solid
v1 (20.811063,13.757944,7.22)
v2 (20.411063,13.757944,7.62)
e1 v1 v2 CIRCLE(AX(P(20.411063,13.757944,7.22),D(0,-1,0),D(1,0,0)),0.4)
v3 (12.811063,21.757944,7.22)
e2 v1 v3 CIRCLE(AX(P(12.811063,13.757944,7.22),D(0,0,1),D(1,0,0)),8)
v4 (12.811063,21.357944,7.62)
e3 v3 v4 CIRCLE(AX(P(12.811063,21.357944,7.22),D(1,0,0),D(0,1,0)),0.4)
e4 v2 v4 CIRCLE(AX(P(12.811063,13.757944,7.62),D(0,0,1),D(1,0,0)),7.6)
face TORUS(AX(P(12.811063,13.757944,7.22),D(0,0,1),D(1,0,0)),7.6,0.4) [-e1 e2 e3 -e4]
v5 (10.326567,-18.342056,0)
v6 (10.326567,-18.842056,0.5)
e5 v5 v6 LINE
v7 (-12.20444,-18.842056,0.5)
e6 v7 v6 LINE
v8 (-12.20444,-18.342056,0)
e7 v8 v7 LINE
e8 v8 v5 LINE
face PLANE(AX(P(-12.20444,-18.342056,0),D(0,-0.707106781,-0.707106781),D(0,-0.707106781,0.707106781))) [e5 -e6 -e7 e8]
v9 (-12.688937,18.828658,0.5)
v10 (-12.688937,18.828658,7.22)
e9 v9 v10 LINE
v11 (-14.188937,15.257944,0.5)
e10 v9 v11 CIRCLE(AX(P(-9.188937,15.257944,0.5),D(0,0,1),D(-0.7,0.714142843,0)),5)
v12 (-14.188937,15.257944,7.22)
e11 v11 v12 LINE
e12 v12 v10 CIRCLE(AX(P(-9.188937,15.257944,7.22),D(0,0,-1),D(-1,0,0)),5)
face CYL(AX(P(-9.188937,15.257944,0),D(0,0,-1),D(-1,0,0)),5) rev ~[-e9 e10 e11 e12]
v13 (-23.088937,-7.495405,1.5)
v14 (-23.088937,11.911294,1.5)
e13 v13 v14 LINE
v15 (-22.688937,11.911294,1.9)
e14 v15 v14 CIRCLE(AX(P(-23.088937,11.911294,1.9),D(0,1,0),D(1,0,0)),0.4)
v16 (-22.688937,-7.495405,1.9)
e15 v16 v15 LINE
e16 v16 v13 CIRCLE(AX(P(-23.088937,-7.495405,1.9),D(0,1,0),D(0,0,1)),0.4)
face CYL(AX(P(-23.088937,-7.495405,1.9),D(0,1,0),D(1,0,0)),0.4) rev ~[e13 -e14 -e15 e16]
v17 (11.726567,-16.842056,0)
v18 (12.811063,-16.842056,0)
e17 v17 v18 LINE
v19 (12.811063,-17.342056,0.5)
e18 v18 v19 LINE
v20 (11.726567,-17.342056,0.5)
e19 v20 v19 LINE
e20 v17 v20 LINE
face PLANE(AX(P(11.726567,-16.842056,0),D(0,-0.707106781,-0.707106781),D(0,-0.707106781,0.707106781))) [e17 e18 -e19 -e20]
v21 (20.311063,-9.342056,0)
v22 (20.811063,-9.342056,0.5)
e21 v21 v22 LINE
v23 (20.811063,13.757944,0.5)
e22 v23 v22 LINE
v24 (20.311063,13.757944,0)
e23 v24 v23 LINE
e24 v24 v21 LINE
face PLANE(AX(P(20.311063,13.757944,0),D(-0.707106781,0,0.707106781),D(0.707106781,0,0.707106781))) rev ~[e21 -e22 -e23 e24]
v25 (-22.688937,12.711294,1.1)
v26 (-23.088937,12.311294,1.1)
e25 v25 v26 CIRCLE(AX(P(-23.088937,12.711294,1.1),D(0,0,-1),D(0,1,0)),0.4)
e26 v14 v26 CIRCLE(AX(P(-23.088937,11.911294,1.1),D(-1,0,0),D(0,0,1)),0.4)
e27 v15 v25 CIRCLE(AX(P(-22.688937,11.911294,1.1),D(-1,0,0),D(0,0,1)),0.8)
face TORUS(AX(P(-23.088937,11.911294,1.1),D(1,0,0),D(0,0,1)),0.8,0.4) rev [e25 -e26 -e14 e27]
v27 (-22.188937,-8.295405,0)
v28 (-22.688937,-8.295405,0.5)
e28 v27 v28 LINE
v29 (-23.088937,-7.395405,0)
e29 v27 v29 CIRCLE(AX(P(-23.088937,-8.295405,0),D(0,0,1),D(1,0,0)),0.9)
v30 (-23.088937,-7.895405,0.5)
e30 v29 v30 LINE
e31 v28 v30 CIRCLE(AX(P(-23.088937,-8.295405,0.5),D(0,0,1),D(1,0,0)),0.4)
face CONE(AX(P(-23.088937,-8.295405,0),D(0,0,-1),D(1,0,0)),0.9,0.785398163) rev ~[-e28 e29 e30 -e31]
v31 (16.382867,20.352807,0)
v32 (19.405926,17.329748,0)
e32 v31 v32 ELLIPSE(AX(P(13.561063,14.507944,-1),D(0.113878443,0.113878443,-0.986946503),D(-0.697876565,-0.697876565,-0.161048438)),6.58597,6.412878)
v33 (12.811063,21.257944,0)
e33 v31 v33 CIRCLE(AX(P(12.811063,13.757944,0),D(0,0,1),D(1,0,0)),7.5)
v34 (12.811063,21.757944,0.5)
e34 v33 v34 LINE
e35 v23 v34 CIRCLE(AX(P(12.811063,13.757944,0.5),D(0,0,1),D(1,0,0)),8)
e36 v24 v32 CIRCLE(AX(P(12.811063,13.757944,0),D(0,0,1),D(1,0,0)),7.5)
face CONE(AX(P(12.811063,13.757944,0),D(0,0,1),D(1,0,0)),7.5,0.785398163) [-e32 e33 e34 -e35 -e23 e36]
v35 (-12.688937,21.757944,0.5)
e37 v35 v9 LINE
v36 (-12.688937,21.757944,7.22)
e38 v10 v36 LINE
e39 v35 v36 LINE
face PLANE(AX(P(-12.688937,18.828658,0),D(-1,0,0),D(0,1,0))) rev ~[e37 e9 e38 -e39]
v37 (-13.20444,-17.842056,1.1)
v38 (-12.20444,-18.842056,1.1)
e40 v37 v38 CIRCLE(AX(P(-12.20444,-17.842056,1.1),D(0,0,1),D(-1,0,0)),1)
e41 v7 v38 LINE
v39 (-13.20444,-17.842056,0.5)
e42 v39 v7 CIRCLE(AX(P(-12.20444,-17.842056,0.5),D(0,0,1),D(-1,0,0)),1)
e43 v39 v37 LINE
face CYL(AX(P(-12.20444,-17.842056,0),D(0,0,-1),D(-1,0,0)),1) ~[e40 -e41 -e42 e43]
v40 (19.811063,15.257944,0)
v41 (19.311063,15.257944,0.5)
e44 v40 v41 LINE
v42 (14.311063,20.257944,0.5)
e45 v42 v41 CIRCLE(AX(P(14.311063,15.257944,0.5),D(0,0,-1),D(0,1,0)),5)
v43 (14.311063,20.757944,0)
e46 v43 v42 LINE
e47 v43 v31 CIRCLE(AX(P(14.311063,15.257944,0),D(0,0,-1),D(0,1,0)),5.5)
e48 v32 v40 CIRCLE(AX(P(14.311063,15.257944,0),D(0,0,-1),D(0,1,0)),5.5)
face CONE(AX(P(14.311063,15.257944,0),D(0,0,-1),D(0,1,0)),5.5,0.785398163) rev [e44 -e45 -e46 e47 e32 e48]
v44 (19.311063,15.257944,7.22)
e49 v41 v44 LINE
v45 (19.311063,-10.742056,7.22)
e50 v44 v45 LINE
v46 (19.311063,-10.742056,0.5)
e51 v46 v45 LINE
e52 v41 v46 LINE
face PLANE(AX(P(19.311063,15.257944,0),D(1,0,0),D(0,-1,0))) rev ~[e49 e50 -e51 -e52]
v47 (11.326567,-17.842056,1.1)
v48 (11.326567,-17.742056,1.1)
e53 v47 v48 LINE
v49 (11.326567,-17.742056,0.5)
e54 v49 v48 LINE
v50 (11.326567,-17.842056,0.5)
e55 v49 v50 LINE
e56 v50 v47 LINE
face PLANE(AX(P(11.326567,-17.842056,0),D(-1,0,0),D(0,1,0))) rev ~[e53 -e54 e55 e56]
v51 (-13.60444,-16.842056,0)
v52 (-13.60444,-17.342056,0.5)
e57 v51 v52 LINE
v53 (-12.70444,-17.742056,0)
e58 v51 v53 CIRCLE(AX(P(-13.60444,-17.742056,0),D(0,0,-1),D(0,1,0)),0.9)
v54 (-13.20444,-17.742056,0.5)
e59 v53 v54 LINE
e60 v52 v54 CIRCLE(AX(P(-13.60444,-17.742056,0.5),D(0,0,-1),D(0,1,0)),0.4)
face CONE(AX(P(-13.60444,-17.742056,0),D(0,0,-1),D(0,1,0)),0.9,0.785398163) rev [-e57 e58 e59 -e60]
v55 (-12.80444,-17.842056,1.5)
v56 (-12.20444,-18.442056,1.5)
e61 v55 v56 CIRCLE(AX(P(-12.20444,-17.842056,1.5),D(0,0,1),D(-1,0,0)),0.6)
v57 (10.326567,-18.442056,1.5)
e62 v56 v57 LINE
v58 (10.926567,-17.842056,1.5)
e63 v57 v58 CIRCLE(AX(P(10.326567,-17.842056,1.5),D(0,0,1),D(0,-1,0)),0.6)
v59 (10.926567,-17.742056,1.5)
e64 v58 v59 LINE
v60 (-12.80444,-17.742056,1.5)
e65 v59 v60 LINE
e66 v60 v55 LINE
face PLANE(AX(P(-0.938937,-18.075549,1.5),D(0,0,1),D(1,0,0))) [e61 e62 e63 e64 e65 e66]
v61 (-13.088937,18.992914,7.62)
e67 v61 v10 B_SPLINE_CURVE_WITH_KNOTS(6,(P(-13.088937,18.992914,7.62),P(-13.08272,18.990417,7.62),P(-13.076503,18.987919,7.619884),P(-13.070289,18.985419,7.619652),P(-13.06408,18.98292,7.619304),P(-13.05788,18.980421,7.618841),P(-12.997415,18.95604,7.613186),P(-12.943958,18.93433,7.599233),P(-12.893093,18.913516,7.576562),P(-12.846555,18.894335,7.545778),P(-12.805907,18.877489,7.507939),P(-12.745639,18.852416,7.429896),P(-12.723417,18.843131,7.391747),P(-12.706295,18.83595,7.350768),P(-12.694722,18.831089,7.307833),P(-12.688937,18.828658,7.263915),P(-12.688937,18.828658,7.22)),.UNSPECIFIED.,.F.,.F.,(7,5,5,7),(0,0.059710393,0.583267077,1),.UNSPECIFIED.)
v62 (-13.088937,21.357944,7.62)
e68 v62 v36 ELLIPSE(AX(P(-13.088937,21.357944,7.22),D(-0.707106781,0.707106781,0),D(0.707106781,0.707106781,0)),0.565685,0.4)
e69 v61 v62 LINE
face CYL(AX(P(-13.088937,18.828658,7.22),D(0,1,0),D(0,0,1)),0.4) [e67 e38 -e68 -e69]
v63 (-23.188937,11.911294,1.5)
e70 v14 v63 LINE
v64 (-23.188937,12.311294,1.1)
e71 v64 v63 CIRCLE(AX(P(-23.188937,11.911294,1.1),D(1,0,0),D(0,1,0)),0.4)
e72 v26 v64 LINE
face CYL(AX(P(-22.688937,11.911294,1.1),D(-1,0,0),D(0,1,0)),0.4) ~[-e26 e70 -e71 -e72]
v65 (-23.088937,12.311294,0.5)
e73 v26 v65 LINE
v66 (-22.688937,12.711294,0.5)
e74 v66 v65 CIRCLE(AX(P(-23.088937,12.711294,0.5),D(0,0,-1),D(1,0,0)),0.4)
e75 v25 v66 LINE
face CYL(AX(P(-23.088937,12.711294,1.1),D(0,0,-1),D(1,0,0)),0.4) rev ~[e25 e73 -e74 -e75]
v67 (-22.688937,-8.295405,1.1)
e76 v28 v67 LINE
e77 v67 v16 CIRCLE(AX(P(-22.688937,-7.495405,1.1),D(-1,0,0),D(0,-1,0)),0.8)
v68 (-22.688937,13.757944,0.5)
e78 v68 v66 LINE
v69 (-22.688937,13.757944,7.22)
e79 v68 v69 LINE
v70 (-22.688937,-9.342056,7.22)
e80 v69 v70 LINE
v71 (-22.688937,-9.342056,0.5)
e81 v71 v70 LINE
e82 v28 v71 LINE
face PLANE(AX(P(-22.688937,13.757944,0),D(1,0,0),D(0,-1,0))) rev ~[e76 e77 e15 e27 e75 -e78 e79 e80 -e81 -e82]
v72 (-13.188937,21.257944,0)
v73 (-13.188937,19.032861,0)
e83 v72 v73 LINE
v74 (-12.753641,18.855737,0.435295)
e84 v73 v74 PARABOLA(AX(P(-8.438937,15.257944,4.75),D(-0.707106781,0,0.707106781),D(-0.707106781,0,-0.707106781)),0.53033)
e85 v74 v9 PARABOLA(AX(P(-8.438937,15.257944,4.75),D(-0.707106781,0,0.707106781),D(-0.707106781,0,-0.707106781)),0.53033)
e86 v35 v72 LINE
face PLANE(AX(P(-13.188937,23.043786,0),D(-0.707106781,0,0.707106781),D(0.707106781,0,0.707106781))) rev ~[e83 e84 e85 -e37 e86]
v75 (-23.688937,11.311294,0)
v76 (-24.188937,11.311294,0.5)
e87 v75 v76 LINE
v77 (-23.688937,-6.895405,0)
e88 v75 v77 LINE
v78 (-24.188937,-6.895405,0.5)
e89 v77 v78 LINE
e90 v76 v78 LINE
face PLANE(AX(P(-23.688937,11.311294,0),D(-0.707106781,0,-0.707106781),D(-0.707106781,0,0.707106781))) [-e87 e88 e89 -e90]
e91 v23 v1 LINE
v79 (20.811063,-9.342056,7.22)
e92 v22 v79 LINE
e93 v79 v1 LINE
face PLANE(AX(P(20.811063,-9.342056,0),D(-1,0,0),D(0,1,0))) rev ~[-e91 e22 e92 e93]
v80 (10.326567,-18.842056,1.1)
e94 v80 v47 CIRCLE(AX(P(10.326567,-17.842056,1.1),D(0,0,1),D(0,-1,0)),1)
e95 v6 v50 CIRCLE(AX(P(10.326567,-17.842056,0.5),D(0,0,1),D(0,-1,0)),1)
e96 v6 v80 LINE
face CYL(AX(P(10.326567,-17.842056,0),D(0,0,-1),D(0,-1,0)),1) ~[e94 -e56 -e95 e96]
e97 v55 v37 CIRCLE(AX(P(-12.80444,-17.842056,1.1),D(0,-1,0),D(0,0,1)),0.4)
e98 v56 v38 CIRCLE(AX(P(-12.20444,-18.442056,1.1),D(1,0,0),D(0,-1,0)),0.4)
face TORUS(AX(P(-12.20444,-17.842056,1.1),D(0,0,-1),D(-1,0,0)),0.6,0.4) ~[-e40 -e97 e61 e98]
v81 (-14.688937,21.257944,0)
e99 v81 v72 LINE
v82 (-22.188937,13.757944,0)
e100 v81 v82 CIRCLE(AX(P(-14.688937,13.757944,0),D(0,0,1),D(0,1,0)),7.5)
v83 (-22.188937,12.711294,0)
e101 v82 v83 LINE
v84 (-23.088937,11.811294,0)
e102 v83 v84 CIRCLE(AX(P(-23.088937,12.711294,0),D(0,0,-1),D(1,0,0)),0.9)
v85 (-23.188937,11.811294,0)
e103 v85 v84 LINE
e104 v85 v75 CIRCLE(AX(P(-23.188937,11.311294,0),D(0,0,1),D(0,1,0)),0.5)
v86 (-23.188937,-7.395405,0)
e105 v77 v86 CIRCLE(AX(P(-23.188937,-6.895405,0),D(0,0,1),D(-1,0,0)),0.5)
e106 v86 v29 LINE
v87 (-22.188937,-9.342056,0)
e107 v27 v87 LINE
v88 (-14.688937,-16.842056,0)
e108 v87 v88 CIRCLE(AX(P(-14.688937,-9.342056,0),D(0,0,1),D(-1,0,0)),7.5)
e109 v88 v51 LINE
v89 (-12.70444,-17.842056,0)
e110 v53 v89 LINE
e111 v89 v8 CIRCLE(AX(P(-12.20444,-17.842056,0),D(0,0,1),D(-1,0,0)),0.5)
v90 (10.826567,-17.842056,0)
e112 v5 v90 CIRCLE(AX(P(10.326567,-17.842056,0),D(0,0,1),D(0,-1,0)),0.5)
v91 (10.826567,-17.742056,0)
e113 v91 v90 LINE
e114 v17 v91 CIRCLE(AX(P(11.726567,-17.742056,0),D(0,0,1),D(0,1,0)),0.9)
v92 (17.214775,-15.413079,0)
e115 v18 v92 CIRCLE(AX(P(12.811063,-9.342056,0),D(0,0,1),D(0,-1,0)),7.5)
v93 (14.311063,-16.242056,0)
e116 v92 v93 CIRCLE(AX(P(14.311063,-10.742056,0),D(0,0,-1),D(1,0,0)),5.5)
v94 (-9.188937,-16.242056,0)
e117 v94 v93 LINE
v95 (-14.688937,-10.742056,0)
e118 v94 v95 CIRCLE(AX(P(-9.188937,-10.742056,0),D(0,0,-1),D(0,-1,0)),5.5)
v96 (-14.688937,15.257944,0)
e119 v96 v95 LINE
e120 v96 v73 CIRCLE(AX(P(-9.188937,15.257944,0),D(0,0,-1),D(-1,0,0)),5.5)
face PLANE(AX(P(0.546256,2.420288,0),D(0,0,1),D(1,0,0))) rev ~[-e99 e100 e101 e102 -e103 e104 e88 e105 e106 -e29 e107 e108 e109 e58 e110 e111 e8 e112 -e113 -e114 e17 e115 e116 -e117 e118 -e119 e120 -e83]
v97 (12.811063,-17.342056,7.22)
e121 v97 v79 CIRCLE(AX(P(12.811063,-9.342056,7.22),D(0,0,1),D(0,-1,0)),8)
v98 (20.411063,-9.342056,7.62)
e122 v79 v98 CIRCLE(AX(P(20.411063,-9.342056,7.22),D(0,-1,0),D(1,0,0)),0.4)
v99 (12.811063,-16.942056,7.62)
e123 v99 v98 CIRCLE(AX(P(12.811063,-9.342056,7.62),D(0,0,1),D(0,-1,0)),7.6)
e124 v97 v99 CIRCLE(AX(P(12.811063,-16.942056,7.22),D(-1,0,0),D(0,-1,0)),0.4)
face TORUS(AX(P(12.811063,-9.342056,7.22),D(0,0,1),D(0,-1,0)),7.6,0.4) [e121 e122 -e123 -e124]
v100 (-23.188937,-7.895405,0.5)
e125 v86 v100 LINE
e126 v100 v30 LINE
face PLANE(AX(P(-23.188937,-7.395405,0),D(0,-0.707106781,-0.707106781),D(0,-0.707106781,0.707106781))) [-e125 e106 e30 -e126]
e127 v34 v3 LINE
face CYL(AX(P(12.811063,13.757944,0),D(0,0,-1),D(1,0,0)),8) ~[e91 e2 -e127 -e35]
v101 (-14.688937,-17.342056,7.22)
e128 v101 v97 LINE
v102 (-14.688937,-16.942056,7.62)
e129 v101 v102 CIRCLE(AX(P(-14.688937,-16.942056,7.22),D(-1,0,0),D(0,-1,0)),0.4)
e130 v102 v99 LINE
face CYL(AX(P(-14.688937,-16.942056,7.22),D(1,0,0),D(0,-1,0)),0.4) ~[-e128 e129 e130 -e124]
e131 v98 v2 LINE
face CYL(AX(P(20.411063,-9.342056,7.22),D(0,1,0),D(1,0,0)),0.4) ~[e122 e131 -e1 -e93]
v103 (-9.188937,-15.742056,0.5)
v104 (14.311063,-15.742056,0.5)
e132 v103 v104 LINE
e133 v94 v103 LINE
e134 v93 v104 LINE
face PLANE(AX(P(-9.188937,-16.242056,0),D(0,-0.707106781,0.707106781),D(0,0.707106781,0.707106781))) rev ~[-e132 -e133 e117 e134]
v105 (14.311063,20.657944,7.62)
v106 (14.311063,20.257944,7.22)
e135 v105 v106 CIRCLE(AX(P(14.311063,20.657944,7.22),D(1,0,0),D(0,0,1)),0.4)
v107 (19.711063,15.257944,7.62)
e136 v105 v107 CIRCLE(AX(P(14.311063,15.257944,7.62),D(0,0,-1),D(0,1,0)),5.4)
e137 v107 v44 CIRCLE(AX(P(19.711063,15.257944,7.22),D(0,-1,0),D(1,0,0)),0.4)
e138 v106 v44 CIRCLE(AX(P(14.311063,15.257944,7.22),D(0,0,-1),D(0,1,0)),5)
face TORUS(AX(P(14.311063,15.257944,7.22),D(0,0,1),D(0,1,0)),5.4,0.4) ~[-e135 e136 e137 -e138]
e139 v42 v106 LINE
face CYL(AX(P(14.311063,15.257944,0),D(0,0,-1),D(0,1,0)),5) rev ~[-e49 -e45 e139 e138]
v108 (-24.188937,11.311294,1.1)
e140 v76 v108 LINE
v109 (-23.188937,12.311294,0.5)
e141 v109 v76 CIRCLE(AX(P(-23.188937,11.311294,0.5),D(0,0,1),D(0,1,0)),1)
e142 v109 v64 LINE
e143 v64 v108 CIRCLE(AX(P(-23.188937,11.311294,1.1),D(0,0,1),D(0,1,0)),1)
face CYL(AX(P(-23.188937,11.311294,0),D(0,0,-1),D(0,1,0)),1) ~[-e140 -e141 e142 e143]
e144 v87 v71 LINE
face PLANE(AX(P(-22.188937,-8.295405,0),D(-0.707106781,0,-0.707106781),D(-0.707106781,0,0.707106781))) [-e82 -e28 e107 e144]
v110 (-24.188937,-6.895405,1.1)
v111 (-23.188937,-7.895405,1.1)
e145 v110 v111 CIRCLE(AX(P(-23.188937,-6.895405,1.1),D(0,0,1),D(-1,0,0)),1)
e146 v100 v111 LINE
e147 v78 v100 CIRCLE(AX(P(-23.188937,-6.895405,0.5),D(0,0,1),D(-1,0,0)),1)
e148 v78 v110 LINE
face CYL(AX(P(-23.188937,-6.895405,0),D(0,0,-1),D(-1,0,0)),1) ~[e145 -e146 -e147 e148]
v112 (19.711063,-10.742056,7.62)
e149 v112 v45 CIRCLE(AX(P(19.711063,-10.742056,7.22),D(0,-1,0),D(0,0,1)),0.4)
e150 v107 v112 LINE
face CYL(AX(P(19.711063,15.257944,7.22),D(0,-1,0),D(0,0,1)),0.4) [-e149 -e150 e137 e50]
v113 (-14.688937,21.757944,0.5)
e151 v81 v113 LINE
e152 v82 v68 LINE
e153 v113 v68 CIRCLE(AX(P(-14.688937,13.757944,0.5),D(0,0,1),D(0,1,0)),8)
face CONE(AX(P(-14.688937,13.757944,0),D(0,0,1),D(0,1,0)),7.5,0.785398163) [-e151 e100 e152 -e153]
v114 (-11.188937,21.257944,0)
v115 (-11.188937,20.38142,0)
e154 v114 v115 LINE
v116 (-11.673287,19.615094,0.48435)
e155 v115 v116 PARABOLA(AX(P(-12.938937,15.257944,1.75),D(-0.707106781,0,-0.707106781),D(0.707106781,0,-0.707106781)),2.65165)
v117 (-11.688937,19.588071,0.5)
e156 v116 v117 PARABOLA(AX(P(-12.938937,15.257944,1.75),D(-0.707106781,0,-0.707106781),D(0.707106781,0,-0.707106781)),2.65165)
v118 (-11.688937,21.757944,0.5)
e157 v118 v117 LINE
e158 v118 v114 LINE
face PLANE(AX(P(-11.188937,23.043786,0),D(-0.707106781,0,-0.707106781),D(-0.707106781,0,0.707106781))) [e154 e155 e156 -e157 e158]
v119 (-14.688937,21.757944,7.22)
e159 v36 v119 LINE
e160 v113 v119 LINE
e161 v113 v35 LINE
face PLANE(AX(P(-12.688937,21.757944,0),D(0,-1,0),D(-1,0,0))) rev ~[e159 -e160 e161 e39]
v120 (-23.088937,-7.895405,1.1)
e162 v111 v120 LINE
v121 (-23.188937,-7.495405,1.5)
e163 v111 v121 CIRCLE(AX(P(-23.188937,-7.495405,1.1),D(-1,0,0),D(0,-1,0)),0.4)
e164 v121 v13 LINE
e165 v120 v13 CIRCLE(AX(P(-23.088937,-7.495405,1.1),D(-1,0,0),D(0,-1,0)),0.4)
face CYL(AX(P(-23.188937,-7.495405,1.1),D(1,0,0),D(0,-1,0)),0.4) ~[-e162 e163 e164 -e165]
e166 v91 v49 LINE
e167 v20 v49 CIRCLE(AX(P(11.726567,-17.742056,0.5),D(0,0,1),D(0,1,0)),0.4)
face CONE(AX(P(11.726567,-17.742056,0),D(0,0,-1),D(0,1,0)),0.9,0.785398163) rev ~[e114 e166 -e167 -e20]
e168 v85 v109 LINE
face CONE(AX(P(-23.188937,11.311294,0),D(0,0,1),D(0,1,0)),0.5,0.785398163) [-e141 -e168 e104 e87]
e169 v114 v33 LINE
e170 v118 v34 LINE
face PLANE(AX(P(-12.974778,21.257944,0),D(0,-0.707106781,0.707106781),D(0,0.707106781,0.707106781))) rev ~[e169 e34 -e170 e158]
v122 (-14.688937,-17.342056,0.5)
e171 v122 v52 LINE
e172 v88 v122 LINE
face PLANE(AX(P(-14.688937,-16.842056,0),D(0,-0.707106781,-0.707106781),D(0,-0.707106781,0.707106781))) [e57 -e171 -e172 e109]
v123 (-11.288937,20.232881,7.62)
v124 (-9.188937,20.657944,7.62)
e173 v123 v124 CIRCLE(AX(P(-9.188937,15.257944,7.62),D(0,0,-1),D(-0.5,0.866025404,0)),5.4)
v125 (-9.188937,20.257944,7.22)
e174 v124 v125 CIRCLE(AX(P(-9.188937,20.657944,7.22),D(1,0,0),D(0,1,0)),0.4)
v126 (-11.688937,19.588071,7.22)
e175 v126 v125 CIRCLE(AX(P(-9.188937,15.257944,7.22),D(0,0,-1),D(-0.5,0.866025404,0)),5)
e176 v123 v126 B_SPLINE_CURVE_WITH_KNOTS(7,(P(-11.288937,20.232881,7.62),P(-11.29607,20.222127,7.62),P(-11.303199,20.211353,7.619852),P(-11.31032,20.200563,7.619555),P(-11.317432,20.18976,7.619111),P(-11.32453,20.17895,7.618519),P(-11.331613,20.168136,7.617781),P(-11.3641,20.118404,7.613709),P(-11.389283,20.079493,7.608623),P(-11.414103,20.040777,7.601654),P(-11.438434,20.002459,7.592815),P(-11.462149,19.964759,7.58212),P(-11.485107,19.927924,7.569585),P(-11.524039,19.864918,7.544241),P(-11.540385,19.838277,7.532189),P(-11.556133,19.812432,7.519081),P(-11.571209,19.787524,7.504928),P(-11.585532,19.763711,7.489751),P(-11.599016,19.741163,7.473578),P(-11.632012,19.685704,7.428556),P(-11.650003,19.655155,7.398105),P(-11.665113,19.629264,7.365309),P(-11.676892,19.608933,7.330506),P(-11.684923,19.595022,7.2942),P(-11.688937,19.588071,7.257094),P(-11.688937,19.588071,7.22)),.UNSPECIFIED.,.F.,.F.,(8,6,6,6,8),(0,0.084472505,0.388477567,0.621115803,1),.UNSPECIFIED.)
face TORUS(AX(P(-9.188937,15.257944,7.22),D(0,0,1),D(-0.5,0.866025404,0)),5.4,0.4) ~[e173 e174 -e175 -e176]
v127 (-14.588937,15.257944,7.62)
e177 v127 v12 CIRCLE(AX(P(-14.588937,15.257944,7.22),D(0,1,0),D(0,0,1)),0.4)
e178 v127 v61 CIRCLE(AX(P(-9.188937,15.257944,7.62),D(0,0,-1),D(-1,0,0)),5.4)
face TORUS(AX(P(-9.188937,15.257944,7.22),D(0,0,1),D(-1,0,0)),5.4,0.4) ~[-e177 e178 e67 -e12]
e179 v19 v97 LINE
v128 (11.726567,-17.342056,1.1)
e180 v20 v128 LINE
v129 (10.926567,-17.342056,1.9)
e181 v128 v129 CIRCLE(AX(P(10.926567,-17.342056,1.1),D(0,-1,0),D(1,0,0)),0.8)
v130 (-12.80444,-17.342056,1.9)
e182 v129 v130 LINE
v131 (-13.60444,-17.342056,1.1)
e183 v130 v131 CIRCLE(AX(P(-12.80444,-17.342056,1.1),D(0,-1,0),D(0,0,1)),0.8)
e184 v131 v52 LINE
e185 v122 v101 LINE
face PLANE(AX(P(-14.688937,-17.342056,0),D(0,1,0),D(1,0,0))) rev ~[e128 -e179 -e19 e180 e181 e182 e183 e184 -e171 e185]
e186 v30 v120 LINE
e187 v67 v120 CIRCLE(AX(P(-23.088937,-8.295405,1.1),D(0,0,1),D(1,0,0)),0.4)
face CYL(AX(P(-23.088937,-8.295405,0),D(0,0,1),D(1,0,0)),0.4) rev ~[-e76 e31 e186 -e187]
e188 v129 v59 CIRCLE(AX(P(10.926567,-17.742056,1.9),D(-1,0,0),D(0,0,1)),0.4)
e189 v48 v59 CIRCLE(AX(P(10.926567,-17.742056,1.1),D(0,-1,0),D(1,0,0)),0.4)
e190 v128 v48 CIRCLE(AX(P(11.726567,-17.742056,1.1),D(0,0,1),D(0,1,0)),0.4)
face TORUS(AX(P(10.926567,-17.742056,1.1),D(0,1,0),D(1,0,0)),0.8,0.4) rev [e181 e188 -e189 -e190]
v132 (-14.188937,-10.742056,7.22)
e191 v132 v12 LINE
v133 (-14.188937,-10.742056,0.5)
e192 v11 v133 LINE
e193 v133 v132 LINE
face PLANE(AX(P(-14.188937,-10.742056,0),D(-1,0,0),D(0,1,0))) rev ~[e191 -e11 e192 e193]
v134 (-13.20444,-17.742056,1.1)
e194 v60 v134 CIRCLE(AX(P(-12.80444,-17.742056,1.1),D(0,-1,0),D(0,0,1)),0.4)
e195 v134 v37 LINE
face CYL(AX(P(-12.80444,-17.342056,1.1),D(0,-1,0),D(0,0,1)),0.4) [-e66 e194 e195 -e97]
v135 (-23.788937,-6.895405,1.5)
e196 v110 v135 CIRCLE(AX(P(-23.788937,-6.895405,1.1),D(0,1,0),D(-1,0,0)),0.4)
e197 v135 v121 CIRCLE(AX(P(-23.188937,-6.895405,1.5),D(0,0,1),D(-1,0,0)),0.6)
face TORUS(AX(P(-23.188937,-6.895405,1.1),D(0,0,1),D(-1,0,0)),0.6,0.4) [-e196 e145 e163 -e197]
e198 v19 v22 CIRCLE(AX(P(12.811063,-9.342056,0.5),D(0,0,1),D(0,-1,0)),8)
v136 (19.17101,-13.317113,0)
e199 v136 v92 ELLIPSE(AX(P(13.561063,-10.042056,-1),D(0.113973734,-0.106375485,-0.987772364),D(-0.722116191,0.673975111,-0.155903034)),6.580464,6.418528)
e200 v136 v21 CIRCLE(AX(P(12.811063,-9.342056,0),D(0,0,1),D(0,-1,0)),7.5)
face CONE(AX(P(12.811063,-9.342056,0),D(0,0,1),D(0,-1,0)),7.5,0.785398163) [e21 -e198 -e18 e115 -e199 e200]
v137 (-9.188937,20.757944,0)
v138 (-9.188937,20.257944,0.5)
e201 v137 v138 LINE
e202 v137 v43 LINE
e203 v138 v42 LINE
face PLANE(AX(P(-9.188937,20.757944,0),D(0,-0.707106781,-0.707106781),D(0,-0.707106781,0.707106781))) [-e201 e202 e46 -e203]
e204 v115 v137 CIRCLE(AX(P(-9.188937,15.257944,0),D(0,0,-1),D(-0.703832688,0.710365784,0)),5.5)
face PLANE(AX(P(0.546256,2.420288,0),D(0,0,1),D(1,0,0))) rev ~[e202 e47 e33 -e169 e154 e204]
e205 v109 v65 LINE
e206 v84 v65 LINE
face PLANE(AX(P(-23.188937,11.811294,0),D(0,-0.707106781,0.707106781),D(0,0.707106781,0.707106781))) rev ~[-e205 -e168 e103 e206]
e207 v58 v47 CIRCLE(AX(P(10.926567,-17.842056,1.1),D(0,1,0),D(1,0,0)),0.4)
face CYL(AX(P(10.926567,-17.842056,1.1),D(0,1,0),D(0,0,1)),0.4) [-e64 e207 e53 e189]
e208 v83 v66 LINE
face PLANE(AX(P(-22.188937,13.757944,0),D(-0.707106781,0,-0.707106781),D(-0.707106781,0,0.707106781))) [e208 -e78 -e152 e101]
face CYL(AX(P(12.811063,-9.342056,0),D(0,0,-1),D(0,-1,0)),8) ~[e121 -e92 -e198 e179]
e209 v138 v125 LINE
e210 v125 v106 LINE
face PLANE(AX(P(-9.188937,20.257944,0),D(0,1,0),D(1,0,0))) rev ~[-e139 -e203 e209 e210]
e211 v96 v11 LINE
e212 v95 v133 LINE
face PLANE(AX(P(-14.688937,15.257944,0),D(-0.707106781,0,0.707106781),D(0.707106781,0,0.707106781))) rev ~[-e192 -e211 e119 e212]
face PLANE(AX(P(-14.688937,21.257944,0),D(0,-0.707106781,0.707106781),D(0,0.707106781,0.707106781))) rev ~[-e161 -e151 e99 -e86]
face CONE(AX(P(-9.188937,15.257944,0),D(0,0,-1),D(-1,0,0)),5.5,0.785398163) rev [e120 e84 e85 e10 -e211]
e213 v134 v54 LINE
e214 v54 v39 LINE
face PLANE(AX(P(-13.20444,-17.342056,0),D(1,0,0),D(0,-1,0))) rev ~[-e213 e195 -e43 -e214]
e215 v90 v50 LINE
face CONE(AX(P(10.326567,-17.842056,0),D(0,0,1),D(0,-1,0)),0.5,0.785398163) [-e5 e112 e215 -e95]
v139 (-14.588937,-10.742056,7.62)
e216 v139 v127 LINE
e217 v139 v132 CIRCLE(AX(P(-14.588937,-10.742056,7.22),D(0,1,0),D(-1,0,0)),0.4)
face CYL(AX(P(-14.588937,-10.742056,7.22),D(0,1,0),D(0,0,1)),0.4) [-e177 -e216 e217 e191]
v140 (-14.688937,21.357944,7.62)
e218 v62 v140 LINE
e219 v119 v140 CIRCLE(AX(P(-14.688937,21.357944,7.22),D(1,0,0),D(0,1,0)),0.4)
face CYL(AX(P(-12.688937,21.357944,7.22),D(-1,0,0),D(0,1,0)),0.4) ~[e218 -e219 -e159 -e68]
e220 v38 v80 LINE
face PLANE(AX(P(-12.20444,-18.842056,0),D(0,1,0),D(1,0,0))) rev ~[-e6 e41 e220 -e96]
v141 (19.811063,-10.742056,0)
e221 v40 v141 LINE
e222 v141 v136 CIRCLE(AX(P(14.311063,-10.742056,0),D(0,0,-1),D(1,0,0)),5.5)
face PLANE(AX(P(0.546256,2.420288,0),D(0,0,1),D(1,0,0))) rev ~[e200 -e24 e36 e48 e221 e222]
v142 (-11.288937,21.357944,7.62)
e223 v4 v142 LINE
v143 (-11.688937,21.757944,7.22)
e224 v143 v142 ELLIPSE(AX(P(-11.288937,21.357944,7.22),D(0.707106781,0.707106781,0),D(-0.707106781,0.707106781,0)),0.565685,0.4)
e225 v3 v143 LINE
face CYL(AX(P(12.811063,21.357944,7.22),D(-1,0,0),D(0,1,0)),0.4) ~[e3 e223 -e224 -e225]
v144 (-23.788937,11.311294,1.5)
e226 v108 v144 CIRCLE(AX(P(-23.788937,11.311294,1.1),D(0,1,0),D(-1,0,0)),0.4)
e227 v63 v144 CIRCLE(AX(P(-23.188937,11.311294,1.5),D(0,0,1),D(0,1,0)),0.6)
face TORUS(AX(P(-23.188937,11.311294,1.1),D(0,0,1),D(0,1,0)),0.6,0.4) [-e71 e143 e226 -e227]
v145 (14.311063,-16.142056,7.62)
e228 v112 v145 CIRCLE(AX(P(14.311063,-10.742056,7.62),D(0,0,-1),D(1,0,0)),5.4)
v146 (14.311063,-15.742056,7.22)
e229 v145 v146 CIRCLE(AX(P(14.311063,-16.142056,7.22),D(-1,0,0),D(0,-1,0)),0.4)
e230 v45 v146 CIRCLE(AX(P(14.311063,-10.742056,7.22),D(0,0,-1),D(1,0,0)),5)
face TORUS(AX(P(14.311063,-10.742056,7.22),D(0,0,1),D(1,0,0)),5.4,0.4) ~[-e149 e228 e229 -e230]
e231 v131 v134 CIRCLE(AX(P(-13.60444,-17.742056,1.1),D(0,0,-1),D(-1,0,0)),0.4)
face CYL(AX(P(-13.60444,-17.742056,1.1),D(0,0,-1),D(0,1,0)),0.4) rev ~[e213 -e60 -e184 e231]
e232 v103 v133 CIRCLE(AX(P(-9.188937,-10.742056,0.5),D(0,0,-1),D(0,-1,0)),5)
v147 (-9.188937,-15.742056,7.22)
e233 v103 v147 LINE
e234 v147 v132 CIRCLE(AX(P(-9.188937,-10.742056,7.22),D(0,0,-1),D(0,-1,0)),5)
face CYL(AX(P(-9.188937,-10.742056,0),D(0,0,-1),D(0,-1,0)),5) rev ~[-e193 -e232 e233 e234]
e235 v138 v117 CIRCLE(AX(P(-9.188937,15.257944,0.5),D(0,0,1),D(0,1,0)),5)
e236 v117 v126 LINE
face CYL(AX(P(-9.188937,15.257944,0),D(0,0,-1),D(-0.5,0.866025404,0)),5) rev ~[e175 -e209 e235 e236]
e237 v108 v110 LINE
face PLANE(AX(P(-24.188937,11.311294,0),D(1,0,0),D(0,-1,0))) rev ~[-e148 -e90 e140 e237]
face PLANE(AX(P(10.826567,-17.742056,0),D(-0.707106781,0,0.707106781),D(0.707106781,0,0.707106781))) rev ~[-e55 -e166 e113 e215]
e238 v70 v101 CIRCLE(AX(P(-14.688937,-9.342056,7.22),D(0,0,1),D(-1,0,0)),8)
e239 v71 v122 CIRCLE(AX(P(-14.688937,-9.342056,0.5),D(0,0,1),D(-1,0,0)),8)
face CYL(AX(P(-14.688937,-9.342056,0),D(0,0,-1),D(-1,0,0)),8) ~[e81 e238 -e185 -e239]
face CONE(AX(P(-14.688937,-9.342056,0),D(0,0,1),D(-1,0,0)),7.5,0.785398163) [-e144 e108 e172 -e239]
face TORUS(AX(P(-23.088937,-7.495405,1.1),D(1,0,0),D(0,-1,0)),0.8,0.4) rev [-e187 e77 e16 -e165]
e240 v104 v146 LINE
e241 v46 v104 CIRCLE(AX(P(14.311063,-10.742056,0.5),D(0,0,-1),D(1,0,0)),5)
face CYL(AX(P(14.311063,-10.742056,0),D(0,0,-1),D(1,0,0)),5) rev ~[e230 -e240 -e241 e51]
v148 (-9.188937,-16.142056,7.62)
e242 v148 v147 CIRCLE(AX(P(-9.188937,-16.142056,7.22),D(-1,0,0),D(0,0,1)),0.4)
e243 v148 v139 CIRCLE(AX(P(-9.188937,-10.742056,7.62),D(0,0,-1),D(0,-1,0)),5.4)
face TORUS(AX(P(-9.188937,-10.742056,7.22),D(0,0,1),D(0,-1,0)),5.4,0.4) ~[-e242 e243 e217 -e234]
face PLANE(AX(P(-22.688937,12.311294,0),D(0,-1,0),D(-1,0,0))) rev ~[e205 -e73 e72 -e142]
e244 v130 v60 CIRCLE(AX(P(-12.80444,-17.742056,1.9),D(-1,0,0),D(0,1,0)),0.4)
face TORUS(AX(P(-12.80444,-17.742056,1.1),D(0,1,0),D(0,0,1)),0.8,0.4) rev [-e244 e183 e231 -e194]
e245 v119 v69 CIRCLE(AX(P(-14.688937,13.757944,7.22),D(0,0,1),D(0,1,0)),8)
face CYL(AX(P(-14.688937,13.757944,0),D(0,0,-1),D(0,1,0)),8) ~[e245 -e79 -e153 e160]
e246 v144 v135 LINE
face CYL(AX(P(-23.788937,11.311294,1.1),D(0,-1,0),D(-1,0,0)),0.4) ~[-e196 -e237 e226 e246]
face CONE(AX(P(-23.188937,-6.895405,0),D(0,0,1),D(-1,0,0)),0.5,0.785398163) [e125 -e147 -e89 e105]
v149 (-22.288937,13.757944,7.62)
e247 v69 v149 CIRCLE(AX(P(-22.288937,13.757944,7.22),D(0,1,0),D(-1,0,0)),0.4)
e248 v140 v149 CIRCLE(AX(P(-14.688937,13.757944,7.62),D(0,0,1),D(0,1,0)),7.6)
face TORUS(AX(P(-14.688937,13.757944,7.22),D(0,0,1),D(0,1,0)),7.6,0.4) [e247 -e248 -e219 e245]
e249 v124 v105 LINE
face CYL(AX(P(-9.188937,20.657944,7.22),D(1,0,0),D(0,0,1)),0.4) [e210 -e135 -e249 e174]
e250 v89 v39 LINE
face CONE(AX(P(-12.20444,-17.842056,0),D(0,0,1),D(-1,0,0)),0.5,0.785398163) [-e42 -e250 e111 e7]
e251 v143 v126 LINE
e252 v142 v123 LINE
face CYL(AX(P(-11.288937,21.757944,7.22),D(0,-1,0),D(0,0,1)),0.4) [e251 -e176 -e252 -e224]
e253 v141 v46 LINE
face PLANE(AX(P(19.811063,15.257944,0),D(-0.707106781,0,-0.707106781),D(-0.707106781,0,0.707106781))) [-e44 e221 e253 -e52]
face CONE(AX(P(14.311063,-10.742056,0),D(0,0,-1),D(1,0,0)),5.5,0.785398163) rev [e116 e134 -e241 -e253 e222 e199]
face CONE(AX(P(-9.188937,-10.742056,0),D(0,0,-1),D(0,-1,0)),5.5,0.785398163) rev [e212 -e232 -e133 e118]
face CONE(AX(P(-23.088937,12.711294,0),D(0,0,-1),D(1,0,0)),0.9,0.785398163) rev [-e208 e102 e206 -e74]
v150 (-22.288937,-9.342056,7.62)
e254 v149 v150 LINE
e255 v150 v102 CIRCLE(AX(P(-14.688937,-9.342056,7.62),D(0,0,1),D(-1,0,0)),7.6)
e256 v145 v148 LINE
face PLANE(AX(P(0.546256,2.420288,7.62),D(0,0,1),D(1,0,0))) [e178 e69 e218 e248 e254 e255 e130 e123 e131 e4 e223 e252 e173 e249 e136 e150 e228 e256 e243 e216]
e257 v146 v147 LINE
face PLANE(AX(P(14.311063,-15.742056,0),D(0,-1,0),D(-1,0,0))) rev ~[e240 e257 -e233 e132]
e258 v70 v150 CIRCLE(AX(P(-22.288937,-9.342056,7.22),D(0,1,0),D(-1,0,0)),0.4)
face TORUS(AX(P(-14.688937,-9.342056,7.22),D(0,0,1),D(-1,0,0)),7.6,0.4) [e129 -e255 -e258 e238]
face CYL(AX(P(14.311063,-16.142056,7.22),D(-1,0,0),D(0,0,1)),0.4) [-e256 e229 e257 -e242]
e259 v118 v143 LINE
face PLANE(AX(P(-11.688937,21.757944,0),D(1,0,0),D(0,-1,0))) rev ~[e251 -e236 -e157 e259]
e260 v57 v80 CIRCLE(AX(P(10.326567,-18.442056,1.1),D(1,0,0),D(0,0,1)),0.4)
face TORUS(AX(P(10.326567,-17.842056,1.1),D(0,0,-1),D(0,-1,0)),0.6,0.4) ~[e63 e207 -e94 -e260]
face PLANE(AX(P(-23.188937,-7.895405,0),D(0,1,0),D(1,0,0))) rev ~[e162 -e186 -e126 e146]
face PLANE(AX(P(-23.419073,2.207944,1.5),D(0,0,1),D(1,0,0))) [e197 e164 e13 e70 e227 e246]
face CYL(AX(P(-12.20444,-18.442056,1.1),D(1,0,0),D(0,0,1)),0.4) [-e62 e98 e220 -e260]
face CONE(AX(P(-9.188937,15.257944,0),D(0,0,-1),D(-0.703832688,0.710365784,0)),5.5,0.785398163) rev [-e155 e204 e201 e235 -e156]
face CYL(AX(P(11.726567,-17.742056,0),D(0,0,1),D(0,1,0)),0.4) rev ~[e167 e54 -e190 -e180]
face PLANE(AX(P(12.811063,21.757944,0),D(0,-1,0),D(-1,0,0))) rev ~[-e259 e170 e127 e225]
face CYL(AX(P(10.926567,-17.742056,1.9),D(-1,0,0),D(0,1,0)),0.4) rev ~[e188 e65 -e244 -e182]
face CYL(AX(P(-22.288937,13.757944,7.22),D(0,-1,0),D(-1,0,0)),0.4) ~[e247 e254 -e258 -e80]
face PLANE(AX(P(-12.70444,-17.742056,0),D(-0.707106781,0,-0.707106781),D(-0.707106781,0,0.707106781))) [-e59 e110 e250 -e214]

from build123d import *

# Parameters (mm, degrees)
F1_DEPTH     = 7.62
F3_DEPTH     = 1.5
F4_F1_R      = 0.4
F4_F2_R      = 0.4
F5_T1_DEPTH  = 1.0466503546
F5_T3_DEPTH  = 0.1
F5_T5_DEPTH  = 3.285841494
F5_T7_DEPTH  = 5.5009687737
F5_T9_DEPTH  = 18.2066992909
F5_T11_DEPTH = 26
F5_T13_DEPTH = 23.5
F5_T15_DEPTH = 1.0466503546
F5_T17_DEPTH = 1.0844961911
F5_T19_DEPTH = 0.1
F5_T21_DEPTH = 4.741555969
F5_T23_DEPTH = 22.5310076177
F5_T25_DEPTH = 25.785841494
F5_T27_DEPTH = 23.1
F5_T29_DEPTH = 1.0844961911
F5_T32_ANGLE = 90
F5_T34_ANGLE = 90
F5_T36_ANGLE = 90
F5_T38_ANGLE = 60.3091715098
F5_T40_ANGLE = 90
F5_T42_ANGLE = 90
F5_T44_ANGLE = 90
F5_T46_ANGLE = 90
F5_T48_ANGLE = 90
F5_T50_ANGLE = 90
F5_T52_ANGLE = 90
F5_T54_ANGLE = 44.7353156515
F5_T56_ANGLE = 90
F5_T58_ANGLE = 90
F5_T60_ANGLE = 90
F5_T62_ANGLE = 90
F5_T64_ANGLE = 90


# Not quite as in the source:
# - a fillet or chamfer that OpenCascade refuses, or shapes differently, is made with other operations: its cross-section is extruded or revolved along the edge and cut away or added


with BuildPart() as f1:
    # F0 (on Top) → F1 (new body)
    with BuildSketch(Plane.XY):
        with BuildLine():
            Line((-13.1889366657, 21.7579442412), (-14.6889366657, 21.7579442412))
            ThreePointArc((-14.6889366657, 21.7579442412), (-20.3457909151, 19.4147984907), (-22.6889366657, 13.7579442412))
            Line((-22.6889366657, 13.7579442412), (-22.6889366657, -9.3420557588))
            ThreePointArc((-22.6889366657, -9.3420557588), (-20.3457909151, -14.9989100083), (-14.6889366657, -17.3420557588))
            Line((-14.6889366657, -17.3420557588), (12.8110633343, -17.3420557588))
            ThreePointArc((12.8110633343, -17.3420557588), (18.4679175838, -14.9989100083), (20.8110633343, -9.3420557588))
            Line((20.8110633343, -9.3420557588), (20.8110633343, 13.7579442412))
            ThreePointArc((20.8110633343, 13.7579442412), (18.4679175838, 19.4147984907), (12.8110633343, 21.7579442412))
            Line((12.8110633343, 21.7579442412), (-11.6889366657, 21.7579442412))
            Line((-11.6889366657, 21.7579442412), (-11.6889366657, 19.5880712601))
            ThreePointArc((-11.6889366657, 19.5880712601), (-10.4830318912, 20.0875733726), (-9.1889366657, 20.2579442412))
            Line((-9.1889366657, 20.2579442412), (14.3110633343, 20.2579442412))
            ThreePointArc((14.3110633343, 20.2579442412), (17.8465972403, 18.7934781471), (19.3110633343, 15.2579442412))
            Line((19.3110633343, 15.2579442412), (19.3110633343, -10.7420557588))
            ThreePointArc((19.3110633343, -10.7420557588), (17.8465972403, -14.2775896648), (14.3110633343, -15.7420557588))
            Line((14.3110633343, -15.7420557588), (-9.1889366657, -15.7420557588))
            ThreePointArc((-9.1889366657, -15.7420557588), (-12.7244705716, -14.2775896648), (-14.1889366657, -10.7420557588))
            Line((-14.1889366657, -10.7420557588), (-14.1889366657, 15.2579442412))
            ThreePointArc((-14.1889366657, 15.2579442412), (-13.7987088943, 17.1944359143), (-12.6889366657, 18.8286584554))
            Line((-12.6889366657, 18.8286584554), (-12.6889366657, 21.7579442412))
            Line((-12.6889366657, 21.7579442412), (-13.1889366657, 21.7579442412))
        make_face()
    extrude(amount=F1_DEPTH)

    # F2 (on Top) → F3 (join)
    with BuildSketch(Plane.XY):
        with BuildLine():
            Line((-22.6889366657, -7.8954054043), (-22.6889366657, 12.3112938866))
            Line((-22.6889366657, 12.3112938866), (-23.1889366657, 12.3112938866))
            ThreePointArc((-23.1889366657, 12.3112938866), (-23.8960434468, 12.0184006678), (-24.1889366657, 11.3112938866))
            Line((-24.1889366657, 11.3112938866), (-24.1889366657, -6.8954054043))
            ThreePointArc((-24.1889366657, -6.8954054043), (-23.8960434468, -7.6025121855), (-23.1889366657, -7.8954054043))
            Line((-23.1889366657, -7.8954054043), (-22.6889366657, -7.8954054043))
        make_face()
        with BuildLine():
            Line((11.3265671432, -17.3420557588), (-13.2044404745, -17.3420557588))
            Line((-13.2044404745, -17.3420557588), (-13.2044404745, -17.8420557588))
            ThreePointArc((-13.2044404745, -17.8420557588), (-12.9115472557, -18.54916254), (-12.2044404745, -18.8420557588))
            Line((-12.2044404745, -18.8420557588), (10.3265671432, -18.8420557588))
            ThreePointArc((10.3265671432, -18.8420557588), (11.0336739244, -18.54916254), (11.3265671432, -17.8420557588))
            Line((11.3265671432, -17.8420557588), (11.3265671432, -17.3420557588))
        make_face()
    extrude(amount=F3_DEPTH)

    # F4: fillet of radius 0.4 on 32 edges, made by hand

    # F4_f1
    f4_f1_edges = [f1.edges().sort_by_distance(p)[0] for p in [
        (-12.6889366657, 20.2933013483, 7.62),
        (-13.6889366657, 21.7579442412, 7.62),
        (-20.3457909151, 19.4147984907, 7.62),
        (-22.6889366657, 2.2079442412, 7.62),
        (-20.3457909151, -14.9989100083, 7.62),
        (-0.9389366657, -17.3420557588, 7.62),
        (18.4679175838, -14.9989100083, 7.62),
        (20.8110633343, 2.2079442412, 7.62),
        (18.4679175838, 19.4147984907, 7.62),
        (0.5610633343, 21.7579442412, 7.62),
        (-11.6889366657, 20.6730077506, 7.62),
        (-10.4830318912, 20.0875733726, 7.62),
        (2.5610633343, 20.2579442412, 7.62),
        (17.8465972403, 18.7934781471, 7.62),
        (19.3110633343, 2.2579442412, 7.62),
        (17.8465972403, -14.2775896648, 7.62),
        (2.5610633343, -15.7420557588, 7.62),
        (-12.7244705716, -14.2775896648, 7.62),
        (-14.1889366657, 2.2579442412, 7.62),
        (-13.7987088943, 17.1944359143, 7.62),
        (11.0336739244, -18.54916254, 1.5),
        (11.3265671432, -17.5920557588, 1.5),
        (-13.2044404745, -17.5920557588, 1.5),
        (-12.9115472557, -18.54916254, 1.5),
        (-0.9389366657, -18.8420557588, 1.5),
        (-22.9389366657, 12.3112938866, 1.5),
        (-23.8960434468, 12.0184006678, 1.5),
        (-24.1889366657, 2.2079442412, 1.5),
        (-23.8960434468, -7.6025121855, 1.5),
        (-22.9389366657, -7.8954054043, 1.5),
    ]]
    fillet(f4_f1_edges, radius=F4_F1_R)

    # F4_f2
    f4_f2_edges = [f1.edges().sort_by_distance(p)[0] for p in [
        (-0.9389366657, -17.3420557588, 1.5),
        (-22.6889366657, 2.2079442412, 1.5),
        (-22.6889366657, -7.7782481167, 1.3828427125),
        (-22.6889366657, 12.1941365991, 1.3828427125),
        (11.2094098557, -17.3420557588, 1.3828427125),
        (-13.087283187, -17.3420557588, 1.3828427125),
    ]]
    fillet(f4_f2_edges, radius=F4_F2_R)

    # F5: chamfer of 0.5 on 36 edges, made by hand

    # F5_s2 → F5_t1 (cut)
    with BuildSketch(Plane.XZ.offset(-13.7579442412)):
        Polygon((-22.1889366657, 0), (-22.6889366657, 0.5), (-22.6889366657, 0), align=None)
    extrude(amount=F5_T1_DEPTH, mode=Mode.SUBTRACT)

    # F5_s4 → F5_t3 (cut)
    with BuildSketch(Plane.YZ.offset(-23.1889366657)):
        Polygon((11.8112938866, 0), (12.3112938866, 0.5), (12.3112938866, 0), align=None)
        Polygon((-7.3954054043, 0), (-7.8954054043, 0.5), (-7.8954054043, 0), align=None)
    extrude(amount=F5_T3_DEPTH, mode=Mode.SUBTRACT)

    # F5_s6 → F5_t5 (cut)
    with BuildSketch(Plane.YZ.offset(-14.6889366657)):
        Polygon((21.2579442412, 0), (21.7579442412, 0.5), (21.7579442412, 0), align=None)
    extrude(amount=F5_T5_DEPTH, mode=Mode.SUBTRACT)

    # F5_s8 → F5_t7 (cut)
    with BuildSketch(Plane.XZ.offset(-23.0437857351)):
        Polygon((-13.1889366657, 0), (-12.6889366657, 0.5), (-12.6889366657, 0), align=None)
    extrude(amount=F5_T7_DEPTH, mode=Mode.SUBTRACT)

    # F5_s10 → F5_t9 (cut)
    with BuildSketch(Plane.XZ.offset(-11.3112938866)):
        Polygon((-23.6889366657, 0), (-24.1889366657, 0.5), (-24.1889366657, 0), align=None)
    extrude(amount=F5_T9_DEPTH, mode=Mode.SUBTRACT)

    # F5_s12 → F5_t11 (cut)
    with BuildSketch(Plane.XZ.offset(-15.2579442412)):
        Polygon((-14.6889366657, 0), (-14.1889366657, 0.5), (-14.1889366657, 0), align=None)
        Polygon((19.8110633343, 0), (19.3110633343, 0.5), (19.3110633343, 0), align=None)
    extrude(amount=F5_T11_DEPTH, mode=Mode.SUBTRACT)

    # F5_s14 → F5_t13 (cut)
    with BuildSketch(Plane.YZ.offset(-9.1889366657)):
        Polygon((-16.2420557588, 0), (-15.7420557588, 0.5), (-15.7420557588, 0), align=None)
        Polygon((20.7579442412, 0), (20.2579442412, 0.5), (20.2579442412, 0), align=None)
    extrude(amount=F5_T13_DEPTH, mode=Mode.SUBTRACT)

    # F5_s16 → F5_t15 (cut)
    with BuildSketch(Plane.XZ.offset(8.2954054043)):
        Polygon((-22.1889366657, 0), (-22.6889366657, 0.5), (-22.6889366657, 0), align=None)
    extrude(amount=F5_T15_DEPTH, mode=Mode.SUBTRACT)

    # F5_s18 → F5_t17 (cut)
    with BuildSketch(Plane.YZ.offset(-14.6889366657)):
        Polygon((-16.8420557588, 0), (-17.3420557588, 0.5), (-17.3420557588, 0), align=None)
    extrude(amount=F5_T17_DEPTH, mode=Mode.SUBTRACT)

    # F5_s20 → F5_t19 (cut)
    with BuildSketch(Plane.XZ.offset(17.7420557588)):
        Polygon((-12.7044404745, 0), (-13.2044404745, 0.5), (-13.2044404745, 0), align=None)
        Polygon((10.8265671432, 0), (11.3265671432, 0.5), (11.3265671432, 0), align=None)
    extrude(amount=F5_T19_DEPTH, mode=Mode.SUBTRACT)

    # F5_s22 → F5_t21 (cut)
    with BuildSketch(Plane.XZ.offset(-23.0437857351)):
        Polygon((-11.1889366657, 0), (-11.6889366657, 0.5), (-11.6889366657, 0), align=None)
    extrude(amount=F5_T21_DEPTH, mode=Mode.SUBTRACT)

    # F5_s24 → F5_t23 (cut)
    with BuildSketch(Plane.YZ.offset(-12.2044404745)):
        Polygon((-18.3420557588, 0), (-18.8420557588, 0.5), (-18.8420557588, 0), align=None)
    extrude(amount=F5_T23_DEPTH, mode=Mode.SUBTRACT)

    # F5_s26 → F5_t25 (cut)
    with BuildSketch(Plane.YZ.offset(-12.9747781596)):
        Polygon((21.2579442412, 0), (21.7579442412, 0.5), (21.7579442412, 0), align=None)
    extrude(amount=F5_T25_DEPTH, mode=Mode.SUBTRACT)

    # F5_s28 → F5_t27 (cut)
    with BuildSketch(Plane.XZ.offset(-13.7579442412)):
        Polygon((20.3110633343, 0), (20.8110633343, 0.5), (20.8110633343, 0), align=None)
    extrude(amount=F5_T27_DEPTH, mode=Mode.SUBTRACT)

    # F5_s30 → F5_t29 (cut)
    with BuildSketch(Plane.YZ.offset(11.7265671432)):
        Polygon((-16.8420557588, 0), (-17.3420557588, 0.5), (-17.3420557588, 0), align=None)
    extrude(amount=F5_T29_DEPTH, mode=Mode.SUBTRACT)

    # F5_s31 → F5_t32 (revolve, cut)
    with BuildSketch(Plane.XZ.offset(-12.7112938866)):
        Polygon((-22.1889366657, 0), (-22.6889366657, 0.5), (-22.6889366657, 0), align=None)
    revolve(axis=Axis((-23.0889366657, 12.7112938866, 0), (0, 0, -1)), revolution_arc=F5_T32_ANGLE, mode=Mode.SUBTRACT)

    # F5_s33 → F5_t34 (revolve, cut)
    with BuildSketch(Plane.YZ.offset(-14.6889366657)):
        Polygon((21.2579442412, 0), (21.7579442412, 0.5), (21.7579442412, 0), align=None)
    revolve(axis=Axis((-14.6889366657, 13.7579442412, 0), (0, 0, 1)), revolution_arc=F5_T34_ANGLE, mode=Mode.SUBTRACT)

    # F5_s35 → F5_t36 (revolve, cut)
    with BuildSketch(Plane.YZ.offset(-23.1889366657)):
        Polygon((11.8112938866, 0), (12.3112938866, 0.5), (12.3112938866, 0), align=None)
    revolve(axis=Axis((-23.1889366657, 11.3112938866, 0), (0, 0, 1)), revolution_arc=F5_T36_ANGLE, mode=Mode.SUBTRACT)

    # F5_s37 → F5_t38 (revolve, cut)
    with BuildSketch(Plane.XZ.offset(-15.2579442412)):
        Polygon((-14.6889366657, 0), (-14.1889366657, 0.5), (-14.1889366657, 0), align=None)
    revolve(axis=Axis((-9.1889366657, 15.2579442412, 0), (0, 0, -1)), revolution_arc=F5_T38_ANGLE, mode=Mode.SUBTRACT)

    # F5_s39 → F5_t40 (revolve, cut)
    with BuildSketch(Plane.XZ.offset(6.8954054043)):
        Polygon((-23.6889366657, 0), (-24.1889366657, 0.5), (-24.1889366657, 0), align=None)
    revolve(axis=Axis((-23.1889366657, -6.8954054043, 0), (0, 0, 1)), revolution_arc=F5_T40_ANGLE, mode=Mode.SUBTRACT)

    # F5_s41 → F5_t42 (revolve, cut)
    with BuildSketch(Plane.YZ.offset(-9.1889366657)):
        Polygon((-16.2420557588, 0), (-15.7420557588, 0.5), (-15.7420557588, 0), align=None)
    revolve(axis=Axis((-9.1889366657, -10.7420557588, 0), (0, 0, -1)), revolution_arc=F5_T42_ANGLE, mode=Mode.SUBTRACT)

    # F5_s43 → F5_t44 (revolve, cut)
    with BuildSketch(Plane.XZ.offset(8.2954054043)):
        Polygon((-22.1889366657, 0), (-22.6889366657, 0.5), (-22.6889366657, 0), align=None)
    revolve(axis=Axis((-23.0889366657, -8.2954054043, 0), (0, 0, 1)), revolution_arc=F5_T44_ANGLE, mode=Mode.SUBTRACT)

    # F5_s45 → F5_t46 (revolve, cut)
    with BuildSketch(Plane.XZ.offset(10.7420557588)):
        Polygon((19.8110633343, 0), (19.3110633343, 0.5), (19.3110633343, 0), align=None)
    revolve(axis=Axis((14.3110633343, -10.7420557588, 0), (0, 0, -1)), revolution_arc=F5_T46_ANGLE, mode=Mode.SUBTRACT)

    # F5_s47 → F5_t48 (revolve, cut)
    with BuildSketch(Plane.XZ.offset(9.3420557588)):
        Polygon((-22.1889366657, 0), (-22.6889366657, 0.5), (-22.6889366657, 0), align=None)
    revolve(axis=Axis((-14.6889366657, -9.3420557588, 0), (0, 0, 1)), revolution_arc=F5_T48_ANGLE, mode=Mode.SUBTRACT)

    # F5_s49 → F5_t50 (revolve, cut)
    with BuildSketch(Plane.YZ.offset(14.3110633343)):
        Polygon((20.7579442412, 0), (20.2579442412, 0.5), (20.2579442412, 0), align=None)
    revolve(axis=Axis((14.3110633343, 15.2579442412, 0), (0, 0, -1)), revolution_arc=F5_T50_ANGLE, mode=Mode.SUBTRACT)

    # F5_s51 → F5_t52 (revolve, cut)
    with BuildSketch(Plane.YZ.offset(-13.6044404745)):
        Polygon((-16.8420557588, 0), (-17.3420557588, 0.5), (-17.3420557588, 0), align=None)
    revolve(axis=Axis((-13.6044404745, -17.7420557588, 0), (0, 0, -1)), revolution_arc=F5_T52_ANGLE, mode=Mode.SUBTRACT)

    # F5_s53 → F5_t54 (revolve, cut)
    with BuildSketch(Plane(origin=(2.9917294423, 2.9642150856, 0), x_dir=(0, 0, 1), z_dir=(-0.7103657844, -0.7038326878, 0))):
        Polygon((0, 22.8061955202), (0.5, 22.3061955202), (0, 22.3061955202), align=None)
    revolve(axis=Axis((-9.1889366657, 15.2579442412, 0), (0, 0, -1)), revolution_arc=F5_T54_ANGLE, mode=Mode.SUBTRACT)

    # F5_s55 → F5_t56 (revolve, cut)
    with BuildSketch(Plane.XZ.offset(17.8420557588)):
        Polygon((-12.7044404745, 0), (-13.2044404745, 0.5), (-13.2044404745, 0), align=None)
    revolve(axis=Axis((-12.2044404745, -17.8420557588, 0), (0, 0, 1)), revolution_arc=F5_T56_ANGLE, mode=Mode.SUBTRACT)

    # F5_s57 → F5_t58 (revolve, cut)
    with BuildSketch(Plane.YZ.offset(10.3265671432)):
        Polygon((-18.3420557588, 0), (-18.8420557588, 0.5), (-18.8420557588, 0), align=None)
    revolve(axis=Axis((10.3265671432, -17.8420557588, 0), (0, 0, 1)), revolution_arc=F5_T58_ANGLE, mode=Mode.SUBTRACT)

    # F5_s59 → F5_t60 (revolve, cut)
    with BuildSketch(Plane.XZ.offset(-13.7579442412)):
        Polygon((20.3110633343, 0), (20.8110633343, 0.5), (20.8110633343, 0), align=None)
    revolve(axis=Axis((12.8110633343, 13.7579442412, 0), (0, 0, 1)), revolution_arc=F5_T60_ANGLE, mode=Mode.SUBTRACT)

    # F5_s61 → F5_t62 (revolve, cut)
    with BuildSketch(Plane.YZ.offset(11.7265671432)):
        Polygon((-16.8420557588, 0), (-17.3420557588, 0.5), (-17.3420557588, 0), align=None)
    revolve(axis=Axis((11.7265671432, -17.7420557588, 0), (0, 0, 1)), revolution_arc=F5_T62_ANGLE, mode=Mode.SUBTRACT)

    # F5_s63 → F5_t64 (revolve, cut)
    with BuildSketch(Plane.YZ.offset(12.8110633343)):
        Polygon((-16.8420557588, 0), (-17.3420557588, 0.5), (-17.3420557588, 0), align=None)
    revolve(axis=Axis((12.8110633343, -9.3420557588, 0), (0, 0, 1)), revolution_arc=F5_T64_ANGLE, mode=Mode.SUBTRACT)


solid = f1.part
